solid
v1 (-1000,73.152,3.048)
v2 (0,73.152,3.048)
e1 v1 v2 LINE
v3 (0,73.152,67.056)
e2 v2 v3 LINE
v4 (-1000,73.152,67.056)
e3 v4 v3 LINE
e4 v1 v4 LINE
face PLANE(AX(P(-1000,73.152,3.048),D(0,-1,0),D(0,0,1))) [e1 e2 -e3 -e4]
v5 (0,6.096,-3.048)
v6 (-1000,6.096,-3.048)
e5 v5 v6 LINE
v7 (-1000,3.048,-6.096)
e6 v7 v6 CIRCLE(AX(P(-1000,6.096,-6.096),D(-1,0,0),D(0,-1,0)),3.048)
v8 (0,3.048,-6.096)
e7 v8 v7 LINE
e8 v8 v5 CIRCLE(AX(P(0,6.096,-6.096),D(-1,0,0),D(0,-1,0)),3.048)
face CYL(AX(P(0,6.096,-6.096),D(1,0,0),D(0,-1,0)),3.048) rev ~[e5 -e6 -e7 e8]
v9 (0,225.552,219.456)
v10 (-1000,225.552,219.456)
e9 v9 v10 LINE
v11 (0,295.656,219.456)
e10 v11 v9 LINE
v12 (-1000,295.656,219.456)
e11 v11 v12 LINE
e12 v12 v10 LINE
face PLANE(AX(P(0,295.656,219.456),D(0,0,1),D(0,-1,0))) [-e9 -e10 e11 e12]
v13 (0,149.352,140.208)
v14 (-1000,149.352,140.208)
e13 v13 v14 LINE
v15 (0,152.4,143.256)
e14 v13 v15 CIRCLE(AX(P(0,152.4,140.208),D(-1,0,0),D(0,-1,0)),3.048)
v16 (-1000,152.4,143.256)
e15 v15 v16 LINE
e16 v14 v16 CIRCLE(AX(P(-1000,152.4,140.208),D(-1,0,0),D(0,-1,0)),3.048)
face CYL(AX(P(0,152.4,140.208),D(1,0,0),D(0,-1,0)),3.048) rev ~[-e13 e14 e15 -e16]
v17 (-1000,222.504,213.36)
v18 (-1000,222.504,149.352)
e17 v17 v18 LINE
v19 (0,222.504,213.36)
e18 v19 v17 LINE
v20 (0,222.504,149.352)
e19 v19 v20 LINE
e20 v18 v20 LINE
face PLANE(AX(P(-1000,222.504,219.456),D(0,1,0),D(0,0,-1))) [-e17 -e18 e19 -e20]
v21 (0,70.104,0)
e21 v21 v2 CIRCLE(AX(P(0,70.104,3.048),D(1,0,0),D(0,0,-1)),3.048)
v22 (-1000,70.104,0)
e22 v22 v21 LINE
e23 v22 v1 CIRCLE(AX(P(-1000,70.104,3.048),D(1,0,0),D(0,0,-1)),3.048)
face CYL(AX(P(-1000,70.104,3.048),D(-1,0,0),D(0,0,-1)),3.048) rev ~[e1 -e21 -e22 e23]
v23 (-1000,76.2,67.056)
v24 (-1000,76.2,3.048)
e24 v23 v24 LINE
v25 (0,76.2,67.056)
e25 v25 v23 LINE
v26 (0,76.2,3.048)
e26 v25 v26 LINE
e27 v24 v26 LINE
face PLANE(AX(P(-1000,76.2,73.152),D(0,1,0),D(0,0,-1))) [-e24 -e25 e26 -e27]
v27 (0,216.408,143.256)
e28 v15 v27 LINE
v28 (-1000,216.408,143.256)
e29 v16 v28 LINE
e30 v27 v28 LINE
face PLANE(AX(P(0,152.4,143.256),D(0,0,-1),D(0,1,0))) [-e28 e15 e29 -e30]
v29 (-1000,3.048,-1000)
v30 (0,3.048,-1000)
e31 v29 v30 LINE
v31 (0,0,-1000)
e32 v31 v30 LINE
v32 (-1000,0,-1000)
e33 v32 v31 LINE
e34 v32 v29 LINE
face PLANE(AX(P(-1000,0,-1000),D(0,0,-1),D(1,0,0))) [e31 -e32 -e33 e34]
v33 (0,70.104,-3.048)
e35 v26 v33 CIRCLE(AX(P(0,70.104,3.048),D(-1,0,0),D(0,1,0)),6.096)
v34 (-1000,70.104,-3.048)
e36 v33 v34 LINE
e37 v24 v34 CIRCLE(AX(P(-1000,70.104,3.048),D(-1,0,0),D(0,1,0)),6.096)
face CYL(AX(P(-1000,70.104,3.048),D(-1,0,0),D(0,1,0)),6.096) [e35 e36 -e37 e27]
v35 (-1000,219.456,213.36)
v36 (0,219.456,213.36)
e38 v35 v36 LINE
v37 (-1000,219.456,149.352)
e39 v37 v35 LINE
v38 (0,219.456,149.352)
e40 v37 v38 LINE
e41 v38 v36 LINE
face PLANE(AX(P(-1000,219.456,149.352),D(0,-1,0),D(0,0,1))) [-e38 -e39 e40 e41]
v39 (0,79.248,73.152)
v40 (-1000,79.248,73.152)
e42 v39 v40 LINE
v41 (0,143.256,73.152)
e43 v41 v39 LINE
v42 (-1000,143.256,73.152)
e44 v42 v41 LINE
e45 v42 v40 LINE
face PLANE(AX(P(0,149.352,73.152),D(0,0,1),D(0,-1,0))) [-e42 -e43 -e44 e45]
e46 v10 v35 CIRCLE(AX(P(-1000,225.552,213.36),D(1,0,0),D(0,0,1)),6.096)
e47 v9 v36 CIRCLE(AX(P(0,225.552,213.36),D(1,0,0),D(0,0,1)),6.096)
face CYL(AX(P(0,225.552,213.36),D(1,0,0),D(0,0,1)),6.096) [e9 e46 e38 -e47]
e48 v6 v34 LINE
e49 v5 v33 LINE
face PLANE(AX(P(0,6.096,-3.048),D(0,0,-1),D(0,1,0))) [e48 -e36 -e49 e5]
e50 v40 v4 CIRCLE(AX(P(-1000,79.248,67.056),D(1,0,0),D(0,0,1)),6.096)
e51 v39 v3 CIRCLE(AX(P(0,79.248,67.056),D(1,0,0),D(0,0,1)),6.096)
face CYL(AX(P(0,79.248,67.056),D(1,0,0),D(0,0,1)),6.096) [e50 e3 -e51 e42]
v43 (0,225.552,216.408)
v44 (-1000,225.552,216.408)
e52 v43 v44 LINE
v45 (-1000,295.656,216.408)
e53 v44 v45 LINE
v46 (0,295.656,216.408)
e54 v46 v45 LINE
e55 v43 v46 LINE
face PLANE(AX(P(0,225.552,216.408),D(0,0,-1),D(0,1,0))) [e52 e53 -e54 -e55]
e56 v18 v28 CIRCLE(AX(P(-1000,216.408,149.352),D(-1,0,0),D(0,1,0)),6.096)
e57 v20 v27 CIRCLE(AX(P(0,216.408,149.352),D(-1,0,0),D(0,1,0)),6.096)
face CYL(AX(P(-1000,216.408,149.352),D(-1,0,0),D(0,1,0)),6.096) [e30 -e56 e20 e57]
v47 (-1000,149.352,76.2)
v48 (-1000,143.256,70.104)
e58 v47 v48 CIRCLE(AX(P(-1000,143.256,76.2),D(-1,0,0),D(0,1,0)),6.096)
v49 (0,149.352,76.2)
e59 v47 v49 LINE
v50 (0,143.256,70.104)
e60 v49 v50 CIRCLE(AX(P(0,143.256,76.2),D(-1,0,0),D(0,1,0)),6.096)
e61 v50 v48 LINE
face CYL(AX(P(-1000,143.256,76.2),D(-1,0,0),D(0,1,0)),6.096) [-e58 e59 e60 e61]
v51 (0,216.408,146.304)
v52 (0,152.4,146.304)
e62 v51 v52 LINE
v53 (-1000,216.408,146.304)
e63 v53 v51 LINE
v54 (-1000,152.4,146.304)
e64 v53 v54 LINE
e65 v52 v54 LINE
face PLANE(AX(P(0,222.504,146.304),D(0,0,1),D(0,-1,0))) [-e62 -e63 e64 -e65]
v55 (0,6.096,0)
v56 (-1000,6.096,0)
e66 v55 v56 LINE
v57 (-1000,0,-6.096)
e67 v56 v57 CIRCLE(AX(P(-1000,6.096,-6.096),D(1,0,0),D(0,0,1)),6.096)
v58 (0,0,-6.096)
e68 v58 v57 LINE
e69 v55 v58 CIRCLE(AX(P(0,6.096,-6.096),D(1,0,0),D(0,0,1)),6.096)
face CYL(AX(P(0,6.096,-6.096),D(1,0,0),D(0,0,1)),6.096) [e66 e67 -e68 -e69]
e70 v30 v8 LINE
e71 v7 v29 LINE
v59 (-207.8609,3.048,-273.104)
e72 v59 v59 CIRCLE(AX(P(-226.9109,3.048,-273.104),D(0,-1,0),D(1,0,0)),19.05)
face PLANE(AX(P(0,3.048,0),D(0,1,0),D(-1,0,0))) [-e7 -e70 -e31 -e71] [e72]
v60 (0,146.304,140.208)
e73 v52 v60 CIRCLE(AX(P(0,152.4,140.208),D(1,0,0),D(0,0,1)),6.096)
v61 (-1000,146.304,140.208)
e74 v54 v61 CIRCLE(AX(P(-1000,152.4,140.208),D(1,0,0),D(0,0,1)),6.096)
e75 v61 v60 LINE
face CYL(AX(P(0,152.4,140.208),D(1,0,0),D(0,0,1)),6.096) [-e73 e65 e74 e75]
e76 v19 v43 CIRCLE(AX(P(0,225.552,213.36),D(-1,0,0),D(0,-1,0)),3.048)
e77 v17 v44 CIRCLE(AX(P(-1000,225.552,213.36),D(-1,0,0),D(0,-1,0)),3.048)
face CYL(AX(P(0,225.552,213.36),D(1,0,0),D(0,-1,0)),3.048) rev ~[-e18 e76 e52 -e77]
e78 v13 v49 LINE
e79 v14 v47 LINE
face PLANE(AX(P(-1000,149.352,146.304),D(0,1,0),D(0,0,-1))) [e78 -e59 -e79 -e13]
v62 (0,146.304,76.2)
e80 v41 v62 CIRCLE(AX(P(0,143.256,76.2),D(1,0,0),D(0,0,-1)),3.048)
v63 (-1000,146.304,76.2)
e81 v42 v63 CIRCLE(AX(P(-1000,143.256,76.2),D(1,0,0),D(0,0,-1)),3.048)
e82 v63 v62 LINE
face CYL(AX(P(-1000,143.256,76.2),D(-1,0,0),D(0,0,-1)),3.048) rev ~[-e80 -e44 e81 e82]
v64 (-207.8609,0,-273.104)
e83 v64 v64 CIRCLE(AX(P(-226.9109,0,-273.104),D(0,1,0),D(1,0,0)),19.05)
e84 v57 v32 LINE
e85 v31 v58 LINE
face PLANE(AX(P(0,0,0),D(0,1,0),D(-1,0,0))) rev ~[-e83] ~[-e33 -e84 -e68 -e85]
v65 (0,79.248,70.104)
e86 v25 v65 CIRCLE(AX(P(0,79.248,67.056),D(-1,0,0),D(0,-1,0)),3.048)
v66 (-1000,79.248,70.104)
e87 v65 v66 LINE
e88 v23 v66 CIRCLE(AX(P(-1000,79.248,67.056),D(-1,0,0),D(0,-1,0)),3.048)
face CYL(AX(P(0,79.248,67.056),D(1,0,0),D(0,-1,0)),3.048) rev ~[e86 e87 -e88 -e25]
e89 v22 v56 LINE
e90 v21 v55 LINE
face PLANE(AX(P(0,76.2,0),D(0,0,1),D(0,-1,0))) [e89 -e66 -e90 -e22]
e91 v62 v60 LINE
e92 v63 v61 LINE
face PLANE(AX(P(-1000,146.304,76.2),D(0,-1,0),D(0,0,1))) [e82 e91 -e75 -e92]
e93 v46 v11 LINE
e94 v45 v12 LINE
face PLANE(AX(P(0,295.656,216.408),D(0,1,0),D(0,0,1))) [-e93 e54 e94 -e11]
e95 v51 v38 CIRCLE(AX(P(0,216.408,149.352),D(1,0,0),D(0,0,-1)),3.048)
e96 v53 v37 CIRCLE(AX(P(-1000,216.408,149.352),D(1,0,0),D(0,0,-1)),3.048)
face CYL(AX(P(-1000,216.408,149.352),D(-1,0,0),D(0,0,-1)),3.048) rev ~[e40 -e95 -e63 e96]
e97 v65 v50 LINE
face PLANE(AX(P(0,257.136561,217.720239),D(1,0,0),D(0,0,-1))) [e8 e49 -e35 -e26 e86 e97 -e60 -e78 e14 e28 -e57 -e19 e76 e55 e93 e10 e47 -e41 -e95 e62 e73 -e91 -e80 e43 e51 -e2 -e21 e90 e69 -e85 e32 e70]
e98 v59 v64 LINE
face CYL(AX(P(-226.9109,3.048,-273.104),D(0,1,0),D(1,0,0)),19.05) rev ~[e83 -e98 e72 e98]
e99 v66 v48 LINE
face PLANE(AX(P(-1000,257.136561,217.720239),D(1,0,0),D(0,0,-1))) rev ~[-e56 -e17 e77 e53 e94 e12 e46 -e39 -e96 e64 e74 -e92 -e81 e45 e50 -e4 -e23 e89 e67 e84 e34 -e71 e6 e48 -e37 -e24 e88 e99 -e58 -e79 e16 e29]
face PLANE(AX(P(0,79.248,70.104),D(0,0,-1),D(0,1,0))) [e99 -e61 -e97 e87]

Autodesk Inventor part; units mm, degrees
ref_plane "YZ Plane" through (0, 0, 0) normal (1, 0, 0) x (0, 1, 0)
ref_plane "XZ Plane" through (0, 0, 0) normal (0, 1, 0) x (-1, 0, 0)
ref_plane "XY Plane" through (0, 0, 0) normal (0, 0, 1) x (1, 0, 0)
sketch "Sketch1" plane through (0, 0, 0) normal (0, 1, 0) x (-1, 0, 0)
  line L0 (0, 0) -> (1000, 0)
  line L1 (1000, 0) -> (1000, -1000)
  line L2 (1000, -1000) -> (0, -1000)
  line L3 (0, -1000) -> (0, 0)
  dimension "d0" = 1000
  dimension "d1" = 1000
extrude "Plate1" add sketch "Sketch1" along normal blind 3.048
sketch "Sketch2" plane through (0, 3.048, 0) normal (0, 1, 0) x (1, 0, 0)
  line L0 (-1000, 0) -> (0, 0) projected
  line L1 (0, 0) -> (-226.9109, 0)
  line L2 (-226.9109, 0) -> (-226.9109, 273.104)
  line L3 (-226.9109, 273.104) -> (0, 273.104)
  line L4 (0, 273.104) -> (0, 0)
  circle A0 centre (-226.9109, 273.104) radius 19.05
  dimension "d3" = 38.1
extrude "Cut1" cut sketch "Sketch2" against normal blind 3.048 contours A0 L3 L2 | L2 L3 A0
sketch "Sketch3" plane through (0, 0, -3.048) normal (0, 0, 1) x (1, 0, 0)
  line L0 (-1000, 0) -> (0, 0)
  line L1 (0, 0) -> (0, 76.2)
  line L2 (0, 76.2) -> (-1000, 76.2)
  line L3 (-1000, 76.2) -> (-1000, 0)
edge flange "Flange1" height 76.2 angle 90 thickness 3.048 bend radius 3.048 thickness toward (0, 0, 1) relief tear relief width 3.048 relief depth 1.524 edges at (-500, 3.048, 0) wall of the first edge with corners at (-1000, 0, -3.048) (0, 0, -3.048) (0, 76.2, -3.048) (-1000, 76.2, -3.048)
bend "Bend1"
corner "Corner1"
sketch "Sketch4" plane through (-1000, 73.152, -3.048) normal (0, 1, 0) x (-1, 0, 0)
  line L0 (-1000, 0) -> (0, 0)
  line L1 (0, 0) -> (0, 76.2)
  line L2 (0, 76.2) -> (-1000, 76.2)
  line L3 (-1000, 76.2) -> (-1000, 0)
edge flange "Flange2" height 76.2 angle 90 thickness 3.048 bend radius 3.048 thickness toward (0, 1, 0) relief tear relief width 3.048 relief depth 1.524 edges at (-500, 76.2, 0) wall of the first edge with corners at (0, 73.152, -3.048) (-1000, 73.152, -3.048) (-1000, 73.152, 73.152) (0, 73.152, 73.152)
bend "Bend2"
corner "Corner2"
sketch "Sketch5" plane through (0, 73.152, 70.104) normal (0, 0, 1) x (1, 0, 0)
  line L0 (-1000, 0) -> (0, 0)
  line L1 (0, 0) -> (0, 76.2)
  line L2 (0, 76.2) -> (-1000, 76.2)
  line L3 (-1000, 76.2) -> (-1000, 0)
edge flange "Flange3" height 76.2 angle 90 thickness 3.048 bend radius 3.048 thickness toward (0, 0, 1) relief tear relief width 3.048 relief depth 1.524 edges at (-500, 76.2, 73.152) wall of the first edge with corners at (-1000, 73.152, 70.104) (0, 73.152, 70.104) (0, 149.352, 70.104) (-1000, 149.352, 70.104)
bend "Bend3"
corner "Corner3"
sketch "Sketch6" plane through (-1000, 146.304, 70.104) normal (0, 1, 0) x (-1, 0, 0)
  line L0 (-1000, 0) -> (0, 0)
  line L1 (0, 0) -> (0, 76.2)
  line L2 (0, 76.2) -> (-1000, 76.2)
  line L3 (-1000, 76.2) -> (-1000, 0)
edge flange "Flange4" height 76.2 angle 90 thickness 3.048 bend radius 3.048 thickness toward (0, 1, 0) relief tear relief width 3.048 relief depth 1.524 edges at (-500, 149.352, 73.152) wall of the first edge with corners at (0, 146.304, 70.104) (-1000, 146.304, 70.104) (-1000, 146.304, 146.304) (0, 146.304, 146.304)
bend "Bend4"
corner "Corner4"
sketch "Sketch7" plane through (0, 146.304, 143.256) normal (0, 0, 1) x (1, 0, 0)
  line L0 (-1000, 0) -> (0, 0)
  line L1 (0, 0) -> (0, 76.2)
  line L2 (0, 76.2) -> (-1000, 76.2)
  line L3 (-1000, 76.2) -> (-1000, 0)
edge flange "Flange5" height 76.2 angle 90 thickness 3.048 bend radius 3.048 thickness toward (0, 0, 1) relief tear relief width 3.048 relief depth 1.524 edges at (-500, 149.352, 146.304) wall of the first edge with corners at (-1000, 146.304, 143.256) (0, 146.304, 143.256) (0, 222.504, 143.256) (-1000, 222.504, 143.256)
bend "Bend5"
corner "Corner5"
sketch "Sketch8" plane through (-1000, 222.504, 146.304) normal (0, 1, 0) x (1, 0, 0)
  point P0 (1000, 146.304)
sketch "Sketch9" plane through (-1000, 219.456, 143.256) normal (0, 1, 0) x (-1, 0, 0)
  line L0 (-1000, 0) -> (0, 0)
  line L1 (0, 0) -> (0, 76.2)
  line L2 (0, 76.2) -> (-1000, 76.2)
  line L3 (-1000, 76.2) -> (-1000, 0)
edge flange "Flange6" height 76.2 angle 90 thickness 3.048 bend radius 3.048 thickness toward (0, 1, 0) relief tear relief width 3.048 relief depth 1.524 edges at (-500, 222.504, 146.304) wall of the first edge with corners at (0, 219.456, 143.256) (-1000, 219.456, 143.256) (-1000, 219.456, 219.456) (0, 219.456, 219.456)
bend "Bend6"
corner "Corner6"
sketch "Sketch10" plane through (0, 219.456, 216.408) normal (0, 0, 1) x (1, 0, 0)
  line L0 (-1000, 0) -> (0, 0)
  line L1 (0, 0) -> (0, 76.2)
  line L2 (0, 76.2) -> (-1000, 76.2)
  line L3 (-1000, 76.2) -> (-1000, 0)
edge flange "Flange7" height 76.2 angle 90 thickness 3.048 bend radius 3.048 thickness toward (0, 0, 1) relief tear relief width 3.048 relief depth 1.524 edges at (-500, 222.504, 219.456) wall of the first edge with corners at (-1000, 219.456, 216.408) (0, 219.456, 216.408) (0, 295.656, 216.408) (-1000, 295.656, 216.408)
bend "Bend7"
corner "Corner7"
equation "\"d4\" = Thickness"
equation "\"d2\" = Thickness"
equation "\"d6\" = BendReliefWidth"
equation "\"d7\" = BendReliefDepth"
equation "\"d8\" = MinimumRemnant"
equation "\"d9\" = TransitionRadius"
equation "\"d12\" = BendRadius"
equation "\"d13\" = CornerReliefSize"
equation "\"d14\" = GapSize"
equation "\"d15\" = JacobiRadiusSize"
equation "\"d16\" = BendReliefWidth"
equation "\"d17\" = BendReliefDepth"
equation "\"d18\" = MinimumRemnant"
equation "\"d19\" = TransitionRadius"
equation "\"d22\" = BendRadius"
equation "\"d23\" = CornerReliefSize"
equation "\"d24\" = GapSize"
equation "\"d25\" = JacobiRadiusSize"
equation "\"d26\" = BendReliefWidth"
equation "\"d27\" = BendReliefDepth"
equation "\"d28\" = MinimumRemnant"
equation "\"d29\" = TransitionRadius"
equation "\"d32\" = BendRadius"
equation "\"d33\" = CornerReliefSize"
equation "\"d34\" = GapSize"
equation "\"d35\" = JacobiRadiusSize"
equation "\"d36\" = BendReliefWidth"
equation "\"d37\" = BendReliefDepth"
equation "\"d38\" = MinimumRemnant"
equation "\"d39\" = TransitionRadius"
equation "\"d42\" = BendRadius"
equation "\"d43\" = CornerReliefSize"
equation "\"d44\" = GapSize"
equation "\"d45\" = JacobiRadiusSize"
equation "\"d46\" = BendReliefWidth"
equation "\"d47\" = BendReliefDepth"
equation "\"d48\" = MinimumRemnant"
equation "\"d49\" = TransitionRadius"
equation "\"d52\" = BendRadius"
equation "\"d53\" = CornerReliefSize"
equation "\"d54\" = GapSize"
equation "\"d55\" = JacobiRadiusSize"
equation "\"d56\" = BendReliefWidth"
equation "\"d57\" = BendReliefDepth"
equation "\"d58\" = MinimumRemnant"
equation "\"d59\" = TransitionRadius"
equation "\"d62\" = BendRadius"
equation "\"d63\" = CornerReliefSize"
equation "\"d64\" = GapSize"
equation "\"d65\" = JacobiRadiusSize"
equation "\"d66\" = BendReliefWidth"
equation "\"d67\" = BendReliefDepth"
equation "\"d68\" = MinimumRemnant"
equation "\"d69\" = TransitionRadius"
equation "\"d72\" = BendRadius"
equation "\"d73\" = CornerReliefSize"
equation "\"d74\" = GapSize"
equation "\"d75\" = JacobiRadiusSize"
equation "\"BendRadius\" = Thickness"
equation "\"BendReliefWidth\" = Thickness"
equation "\"BendReliefDepth\" = 0.5 * Thickness"
equation "\"CornerReliefSize\" = 4 * Thickness"
equation "\"MinimumRemnant\" = 2 * Thickness"
equation "\"TransitionRadius\" = BendRadius"
equation "\"JacobiRadiusSize\" = BendRadius"
equation "\"GapSize\" = Thickness"
equation "\"Thickness\" = 3.048"
properties part number "Floor, Shower" material "Polyethylene, High Density"
